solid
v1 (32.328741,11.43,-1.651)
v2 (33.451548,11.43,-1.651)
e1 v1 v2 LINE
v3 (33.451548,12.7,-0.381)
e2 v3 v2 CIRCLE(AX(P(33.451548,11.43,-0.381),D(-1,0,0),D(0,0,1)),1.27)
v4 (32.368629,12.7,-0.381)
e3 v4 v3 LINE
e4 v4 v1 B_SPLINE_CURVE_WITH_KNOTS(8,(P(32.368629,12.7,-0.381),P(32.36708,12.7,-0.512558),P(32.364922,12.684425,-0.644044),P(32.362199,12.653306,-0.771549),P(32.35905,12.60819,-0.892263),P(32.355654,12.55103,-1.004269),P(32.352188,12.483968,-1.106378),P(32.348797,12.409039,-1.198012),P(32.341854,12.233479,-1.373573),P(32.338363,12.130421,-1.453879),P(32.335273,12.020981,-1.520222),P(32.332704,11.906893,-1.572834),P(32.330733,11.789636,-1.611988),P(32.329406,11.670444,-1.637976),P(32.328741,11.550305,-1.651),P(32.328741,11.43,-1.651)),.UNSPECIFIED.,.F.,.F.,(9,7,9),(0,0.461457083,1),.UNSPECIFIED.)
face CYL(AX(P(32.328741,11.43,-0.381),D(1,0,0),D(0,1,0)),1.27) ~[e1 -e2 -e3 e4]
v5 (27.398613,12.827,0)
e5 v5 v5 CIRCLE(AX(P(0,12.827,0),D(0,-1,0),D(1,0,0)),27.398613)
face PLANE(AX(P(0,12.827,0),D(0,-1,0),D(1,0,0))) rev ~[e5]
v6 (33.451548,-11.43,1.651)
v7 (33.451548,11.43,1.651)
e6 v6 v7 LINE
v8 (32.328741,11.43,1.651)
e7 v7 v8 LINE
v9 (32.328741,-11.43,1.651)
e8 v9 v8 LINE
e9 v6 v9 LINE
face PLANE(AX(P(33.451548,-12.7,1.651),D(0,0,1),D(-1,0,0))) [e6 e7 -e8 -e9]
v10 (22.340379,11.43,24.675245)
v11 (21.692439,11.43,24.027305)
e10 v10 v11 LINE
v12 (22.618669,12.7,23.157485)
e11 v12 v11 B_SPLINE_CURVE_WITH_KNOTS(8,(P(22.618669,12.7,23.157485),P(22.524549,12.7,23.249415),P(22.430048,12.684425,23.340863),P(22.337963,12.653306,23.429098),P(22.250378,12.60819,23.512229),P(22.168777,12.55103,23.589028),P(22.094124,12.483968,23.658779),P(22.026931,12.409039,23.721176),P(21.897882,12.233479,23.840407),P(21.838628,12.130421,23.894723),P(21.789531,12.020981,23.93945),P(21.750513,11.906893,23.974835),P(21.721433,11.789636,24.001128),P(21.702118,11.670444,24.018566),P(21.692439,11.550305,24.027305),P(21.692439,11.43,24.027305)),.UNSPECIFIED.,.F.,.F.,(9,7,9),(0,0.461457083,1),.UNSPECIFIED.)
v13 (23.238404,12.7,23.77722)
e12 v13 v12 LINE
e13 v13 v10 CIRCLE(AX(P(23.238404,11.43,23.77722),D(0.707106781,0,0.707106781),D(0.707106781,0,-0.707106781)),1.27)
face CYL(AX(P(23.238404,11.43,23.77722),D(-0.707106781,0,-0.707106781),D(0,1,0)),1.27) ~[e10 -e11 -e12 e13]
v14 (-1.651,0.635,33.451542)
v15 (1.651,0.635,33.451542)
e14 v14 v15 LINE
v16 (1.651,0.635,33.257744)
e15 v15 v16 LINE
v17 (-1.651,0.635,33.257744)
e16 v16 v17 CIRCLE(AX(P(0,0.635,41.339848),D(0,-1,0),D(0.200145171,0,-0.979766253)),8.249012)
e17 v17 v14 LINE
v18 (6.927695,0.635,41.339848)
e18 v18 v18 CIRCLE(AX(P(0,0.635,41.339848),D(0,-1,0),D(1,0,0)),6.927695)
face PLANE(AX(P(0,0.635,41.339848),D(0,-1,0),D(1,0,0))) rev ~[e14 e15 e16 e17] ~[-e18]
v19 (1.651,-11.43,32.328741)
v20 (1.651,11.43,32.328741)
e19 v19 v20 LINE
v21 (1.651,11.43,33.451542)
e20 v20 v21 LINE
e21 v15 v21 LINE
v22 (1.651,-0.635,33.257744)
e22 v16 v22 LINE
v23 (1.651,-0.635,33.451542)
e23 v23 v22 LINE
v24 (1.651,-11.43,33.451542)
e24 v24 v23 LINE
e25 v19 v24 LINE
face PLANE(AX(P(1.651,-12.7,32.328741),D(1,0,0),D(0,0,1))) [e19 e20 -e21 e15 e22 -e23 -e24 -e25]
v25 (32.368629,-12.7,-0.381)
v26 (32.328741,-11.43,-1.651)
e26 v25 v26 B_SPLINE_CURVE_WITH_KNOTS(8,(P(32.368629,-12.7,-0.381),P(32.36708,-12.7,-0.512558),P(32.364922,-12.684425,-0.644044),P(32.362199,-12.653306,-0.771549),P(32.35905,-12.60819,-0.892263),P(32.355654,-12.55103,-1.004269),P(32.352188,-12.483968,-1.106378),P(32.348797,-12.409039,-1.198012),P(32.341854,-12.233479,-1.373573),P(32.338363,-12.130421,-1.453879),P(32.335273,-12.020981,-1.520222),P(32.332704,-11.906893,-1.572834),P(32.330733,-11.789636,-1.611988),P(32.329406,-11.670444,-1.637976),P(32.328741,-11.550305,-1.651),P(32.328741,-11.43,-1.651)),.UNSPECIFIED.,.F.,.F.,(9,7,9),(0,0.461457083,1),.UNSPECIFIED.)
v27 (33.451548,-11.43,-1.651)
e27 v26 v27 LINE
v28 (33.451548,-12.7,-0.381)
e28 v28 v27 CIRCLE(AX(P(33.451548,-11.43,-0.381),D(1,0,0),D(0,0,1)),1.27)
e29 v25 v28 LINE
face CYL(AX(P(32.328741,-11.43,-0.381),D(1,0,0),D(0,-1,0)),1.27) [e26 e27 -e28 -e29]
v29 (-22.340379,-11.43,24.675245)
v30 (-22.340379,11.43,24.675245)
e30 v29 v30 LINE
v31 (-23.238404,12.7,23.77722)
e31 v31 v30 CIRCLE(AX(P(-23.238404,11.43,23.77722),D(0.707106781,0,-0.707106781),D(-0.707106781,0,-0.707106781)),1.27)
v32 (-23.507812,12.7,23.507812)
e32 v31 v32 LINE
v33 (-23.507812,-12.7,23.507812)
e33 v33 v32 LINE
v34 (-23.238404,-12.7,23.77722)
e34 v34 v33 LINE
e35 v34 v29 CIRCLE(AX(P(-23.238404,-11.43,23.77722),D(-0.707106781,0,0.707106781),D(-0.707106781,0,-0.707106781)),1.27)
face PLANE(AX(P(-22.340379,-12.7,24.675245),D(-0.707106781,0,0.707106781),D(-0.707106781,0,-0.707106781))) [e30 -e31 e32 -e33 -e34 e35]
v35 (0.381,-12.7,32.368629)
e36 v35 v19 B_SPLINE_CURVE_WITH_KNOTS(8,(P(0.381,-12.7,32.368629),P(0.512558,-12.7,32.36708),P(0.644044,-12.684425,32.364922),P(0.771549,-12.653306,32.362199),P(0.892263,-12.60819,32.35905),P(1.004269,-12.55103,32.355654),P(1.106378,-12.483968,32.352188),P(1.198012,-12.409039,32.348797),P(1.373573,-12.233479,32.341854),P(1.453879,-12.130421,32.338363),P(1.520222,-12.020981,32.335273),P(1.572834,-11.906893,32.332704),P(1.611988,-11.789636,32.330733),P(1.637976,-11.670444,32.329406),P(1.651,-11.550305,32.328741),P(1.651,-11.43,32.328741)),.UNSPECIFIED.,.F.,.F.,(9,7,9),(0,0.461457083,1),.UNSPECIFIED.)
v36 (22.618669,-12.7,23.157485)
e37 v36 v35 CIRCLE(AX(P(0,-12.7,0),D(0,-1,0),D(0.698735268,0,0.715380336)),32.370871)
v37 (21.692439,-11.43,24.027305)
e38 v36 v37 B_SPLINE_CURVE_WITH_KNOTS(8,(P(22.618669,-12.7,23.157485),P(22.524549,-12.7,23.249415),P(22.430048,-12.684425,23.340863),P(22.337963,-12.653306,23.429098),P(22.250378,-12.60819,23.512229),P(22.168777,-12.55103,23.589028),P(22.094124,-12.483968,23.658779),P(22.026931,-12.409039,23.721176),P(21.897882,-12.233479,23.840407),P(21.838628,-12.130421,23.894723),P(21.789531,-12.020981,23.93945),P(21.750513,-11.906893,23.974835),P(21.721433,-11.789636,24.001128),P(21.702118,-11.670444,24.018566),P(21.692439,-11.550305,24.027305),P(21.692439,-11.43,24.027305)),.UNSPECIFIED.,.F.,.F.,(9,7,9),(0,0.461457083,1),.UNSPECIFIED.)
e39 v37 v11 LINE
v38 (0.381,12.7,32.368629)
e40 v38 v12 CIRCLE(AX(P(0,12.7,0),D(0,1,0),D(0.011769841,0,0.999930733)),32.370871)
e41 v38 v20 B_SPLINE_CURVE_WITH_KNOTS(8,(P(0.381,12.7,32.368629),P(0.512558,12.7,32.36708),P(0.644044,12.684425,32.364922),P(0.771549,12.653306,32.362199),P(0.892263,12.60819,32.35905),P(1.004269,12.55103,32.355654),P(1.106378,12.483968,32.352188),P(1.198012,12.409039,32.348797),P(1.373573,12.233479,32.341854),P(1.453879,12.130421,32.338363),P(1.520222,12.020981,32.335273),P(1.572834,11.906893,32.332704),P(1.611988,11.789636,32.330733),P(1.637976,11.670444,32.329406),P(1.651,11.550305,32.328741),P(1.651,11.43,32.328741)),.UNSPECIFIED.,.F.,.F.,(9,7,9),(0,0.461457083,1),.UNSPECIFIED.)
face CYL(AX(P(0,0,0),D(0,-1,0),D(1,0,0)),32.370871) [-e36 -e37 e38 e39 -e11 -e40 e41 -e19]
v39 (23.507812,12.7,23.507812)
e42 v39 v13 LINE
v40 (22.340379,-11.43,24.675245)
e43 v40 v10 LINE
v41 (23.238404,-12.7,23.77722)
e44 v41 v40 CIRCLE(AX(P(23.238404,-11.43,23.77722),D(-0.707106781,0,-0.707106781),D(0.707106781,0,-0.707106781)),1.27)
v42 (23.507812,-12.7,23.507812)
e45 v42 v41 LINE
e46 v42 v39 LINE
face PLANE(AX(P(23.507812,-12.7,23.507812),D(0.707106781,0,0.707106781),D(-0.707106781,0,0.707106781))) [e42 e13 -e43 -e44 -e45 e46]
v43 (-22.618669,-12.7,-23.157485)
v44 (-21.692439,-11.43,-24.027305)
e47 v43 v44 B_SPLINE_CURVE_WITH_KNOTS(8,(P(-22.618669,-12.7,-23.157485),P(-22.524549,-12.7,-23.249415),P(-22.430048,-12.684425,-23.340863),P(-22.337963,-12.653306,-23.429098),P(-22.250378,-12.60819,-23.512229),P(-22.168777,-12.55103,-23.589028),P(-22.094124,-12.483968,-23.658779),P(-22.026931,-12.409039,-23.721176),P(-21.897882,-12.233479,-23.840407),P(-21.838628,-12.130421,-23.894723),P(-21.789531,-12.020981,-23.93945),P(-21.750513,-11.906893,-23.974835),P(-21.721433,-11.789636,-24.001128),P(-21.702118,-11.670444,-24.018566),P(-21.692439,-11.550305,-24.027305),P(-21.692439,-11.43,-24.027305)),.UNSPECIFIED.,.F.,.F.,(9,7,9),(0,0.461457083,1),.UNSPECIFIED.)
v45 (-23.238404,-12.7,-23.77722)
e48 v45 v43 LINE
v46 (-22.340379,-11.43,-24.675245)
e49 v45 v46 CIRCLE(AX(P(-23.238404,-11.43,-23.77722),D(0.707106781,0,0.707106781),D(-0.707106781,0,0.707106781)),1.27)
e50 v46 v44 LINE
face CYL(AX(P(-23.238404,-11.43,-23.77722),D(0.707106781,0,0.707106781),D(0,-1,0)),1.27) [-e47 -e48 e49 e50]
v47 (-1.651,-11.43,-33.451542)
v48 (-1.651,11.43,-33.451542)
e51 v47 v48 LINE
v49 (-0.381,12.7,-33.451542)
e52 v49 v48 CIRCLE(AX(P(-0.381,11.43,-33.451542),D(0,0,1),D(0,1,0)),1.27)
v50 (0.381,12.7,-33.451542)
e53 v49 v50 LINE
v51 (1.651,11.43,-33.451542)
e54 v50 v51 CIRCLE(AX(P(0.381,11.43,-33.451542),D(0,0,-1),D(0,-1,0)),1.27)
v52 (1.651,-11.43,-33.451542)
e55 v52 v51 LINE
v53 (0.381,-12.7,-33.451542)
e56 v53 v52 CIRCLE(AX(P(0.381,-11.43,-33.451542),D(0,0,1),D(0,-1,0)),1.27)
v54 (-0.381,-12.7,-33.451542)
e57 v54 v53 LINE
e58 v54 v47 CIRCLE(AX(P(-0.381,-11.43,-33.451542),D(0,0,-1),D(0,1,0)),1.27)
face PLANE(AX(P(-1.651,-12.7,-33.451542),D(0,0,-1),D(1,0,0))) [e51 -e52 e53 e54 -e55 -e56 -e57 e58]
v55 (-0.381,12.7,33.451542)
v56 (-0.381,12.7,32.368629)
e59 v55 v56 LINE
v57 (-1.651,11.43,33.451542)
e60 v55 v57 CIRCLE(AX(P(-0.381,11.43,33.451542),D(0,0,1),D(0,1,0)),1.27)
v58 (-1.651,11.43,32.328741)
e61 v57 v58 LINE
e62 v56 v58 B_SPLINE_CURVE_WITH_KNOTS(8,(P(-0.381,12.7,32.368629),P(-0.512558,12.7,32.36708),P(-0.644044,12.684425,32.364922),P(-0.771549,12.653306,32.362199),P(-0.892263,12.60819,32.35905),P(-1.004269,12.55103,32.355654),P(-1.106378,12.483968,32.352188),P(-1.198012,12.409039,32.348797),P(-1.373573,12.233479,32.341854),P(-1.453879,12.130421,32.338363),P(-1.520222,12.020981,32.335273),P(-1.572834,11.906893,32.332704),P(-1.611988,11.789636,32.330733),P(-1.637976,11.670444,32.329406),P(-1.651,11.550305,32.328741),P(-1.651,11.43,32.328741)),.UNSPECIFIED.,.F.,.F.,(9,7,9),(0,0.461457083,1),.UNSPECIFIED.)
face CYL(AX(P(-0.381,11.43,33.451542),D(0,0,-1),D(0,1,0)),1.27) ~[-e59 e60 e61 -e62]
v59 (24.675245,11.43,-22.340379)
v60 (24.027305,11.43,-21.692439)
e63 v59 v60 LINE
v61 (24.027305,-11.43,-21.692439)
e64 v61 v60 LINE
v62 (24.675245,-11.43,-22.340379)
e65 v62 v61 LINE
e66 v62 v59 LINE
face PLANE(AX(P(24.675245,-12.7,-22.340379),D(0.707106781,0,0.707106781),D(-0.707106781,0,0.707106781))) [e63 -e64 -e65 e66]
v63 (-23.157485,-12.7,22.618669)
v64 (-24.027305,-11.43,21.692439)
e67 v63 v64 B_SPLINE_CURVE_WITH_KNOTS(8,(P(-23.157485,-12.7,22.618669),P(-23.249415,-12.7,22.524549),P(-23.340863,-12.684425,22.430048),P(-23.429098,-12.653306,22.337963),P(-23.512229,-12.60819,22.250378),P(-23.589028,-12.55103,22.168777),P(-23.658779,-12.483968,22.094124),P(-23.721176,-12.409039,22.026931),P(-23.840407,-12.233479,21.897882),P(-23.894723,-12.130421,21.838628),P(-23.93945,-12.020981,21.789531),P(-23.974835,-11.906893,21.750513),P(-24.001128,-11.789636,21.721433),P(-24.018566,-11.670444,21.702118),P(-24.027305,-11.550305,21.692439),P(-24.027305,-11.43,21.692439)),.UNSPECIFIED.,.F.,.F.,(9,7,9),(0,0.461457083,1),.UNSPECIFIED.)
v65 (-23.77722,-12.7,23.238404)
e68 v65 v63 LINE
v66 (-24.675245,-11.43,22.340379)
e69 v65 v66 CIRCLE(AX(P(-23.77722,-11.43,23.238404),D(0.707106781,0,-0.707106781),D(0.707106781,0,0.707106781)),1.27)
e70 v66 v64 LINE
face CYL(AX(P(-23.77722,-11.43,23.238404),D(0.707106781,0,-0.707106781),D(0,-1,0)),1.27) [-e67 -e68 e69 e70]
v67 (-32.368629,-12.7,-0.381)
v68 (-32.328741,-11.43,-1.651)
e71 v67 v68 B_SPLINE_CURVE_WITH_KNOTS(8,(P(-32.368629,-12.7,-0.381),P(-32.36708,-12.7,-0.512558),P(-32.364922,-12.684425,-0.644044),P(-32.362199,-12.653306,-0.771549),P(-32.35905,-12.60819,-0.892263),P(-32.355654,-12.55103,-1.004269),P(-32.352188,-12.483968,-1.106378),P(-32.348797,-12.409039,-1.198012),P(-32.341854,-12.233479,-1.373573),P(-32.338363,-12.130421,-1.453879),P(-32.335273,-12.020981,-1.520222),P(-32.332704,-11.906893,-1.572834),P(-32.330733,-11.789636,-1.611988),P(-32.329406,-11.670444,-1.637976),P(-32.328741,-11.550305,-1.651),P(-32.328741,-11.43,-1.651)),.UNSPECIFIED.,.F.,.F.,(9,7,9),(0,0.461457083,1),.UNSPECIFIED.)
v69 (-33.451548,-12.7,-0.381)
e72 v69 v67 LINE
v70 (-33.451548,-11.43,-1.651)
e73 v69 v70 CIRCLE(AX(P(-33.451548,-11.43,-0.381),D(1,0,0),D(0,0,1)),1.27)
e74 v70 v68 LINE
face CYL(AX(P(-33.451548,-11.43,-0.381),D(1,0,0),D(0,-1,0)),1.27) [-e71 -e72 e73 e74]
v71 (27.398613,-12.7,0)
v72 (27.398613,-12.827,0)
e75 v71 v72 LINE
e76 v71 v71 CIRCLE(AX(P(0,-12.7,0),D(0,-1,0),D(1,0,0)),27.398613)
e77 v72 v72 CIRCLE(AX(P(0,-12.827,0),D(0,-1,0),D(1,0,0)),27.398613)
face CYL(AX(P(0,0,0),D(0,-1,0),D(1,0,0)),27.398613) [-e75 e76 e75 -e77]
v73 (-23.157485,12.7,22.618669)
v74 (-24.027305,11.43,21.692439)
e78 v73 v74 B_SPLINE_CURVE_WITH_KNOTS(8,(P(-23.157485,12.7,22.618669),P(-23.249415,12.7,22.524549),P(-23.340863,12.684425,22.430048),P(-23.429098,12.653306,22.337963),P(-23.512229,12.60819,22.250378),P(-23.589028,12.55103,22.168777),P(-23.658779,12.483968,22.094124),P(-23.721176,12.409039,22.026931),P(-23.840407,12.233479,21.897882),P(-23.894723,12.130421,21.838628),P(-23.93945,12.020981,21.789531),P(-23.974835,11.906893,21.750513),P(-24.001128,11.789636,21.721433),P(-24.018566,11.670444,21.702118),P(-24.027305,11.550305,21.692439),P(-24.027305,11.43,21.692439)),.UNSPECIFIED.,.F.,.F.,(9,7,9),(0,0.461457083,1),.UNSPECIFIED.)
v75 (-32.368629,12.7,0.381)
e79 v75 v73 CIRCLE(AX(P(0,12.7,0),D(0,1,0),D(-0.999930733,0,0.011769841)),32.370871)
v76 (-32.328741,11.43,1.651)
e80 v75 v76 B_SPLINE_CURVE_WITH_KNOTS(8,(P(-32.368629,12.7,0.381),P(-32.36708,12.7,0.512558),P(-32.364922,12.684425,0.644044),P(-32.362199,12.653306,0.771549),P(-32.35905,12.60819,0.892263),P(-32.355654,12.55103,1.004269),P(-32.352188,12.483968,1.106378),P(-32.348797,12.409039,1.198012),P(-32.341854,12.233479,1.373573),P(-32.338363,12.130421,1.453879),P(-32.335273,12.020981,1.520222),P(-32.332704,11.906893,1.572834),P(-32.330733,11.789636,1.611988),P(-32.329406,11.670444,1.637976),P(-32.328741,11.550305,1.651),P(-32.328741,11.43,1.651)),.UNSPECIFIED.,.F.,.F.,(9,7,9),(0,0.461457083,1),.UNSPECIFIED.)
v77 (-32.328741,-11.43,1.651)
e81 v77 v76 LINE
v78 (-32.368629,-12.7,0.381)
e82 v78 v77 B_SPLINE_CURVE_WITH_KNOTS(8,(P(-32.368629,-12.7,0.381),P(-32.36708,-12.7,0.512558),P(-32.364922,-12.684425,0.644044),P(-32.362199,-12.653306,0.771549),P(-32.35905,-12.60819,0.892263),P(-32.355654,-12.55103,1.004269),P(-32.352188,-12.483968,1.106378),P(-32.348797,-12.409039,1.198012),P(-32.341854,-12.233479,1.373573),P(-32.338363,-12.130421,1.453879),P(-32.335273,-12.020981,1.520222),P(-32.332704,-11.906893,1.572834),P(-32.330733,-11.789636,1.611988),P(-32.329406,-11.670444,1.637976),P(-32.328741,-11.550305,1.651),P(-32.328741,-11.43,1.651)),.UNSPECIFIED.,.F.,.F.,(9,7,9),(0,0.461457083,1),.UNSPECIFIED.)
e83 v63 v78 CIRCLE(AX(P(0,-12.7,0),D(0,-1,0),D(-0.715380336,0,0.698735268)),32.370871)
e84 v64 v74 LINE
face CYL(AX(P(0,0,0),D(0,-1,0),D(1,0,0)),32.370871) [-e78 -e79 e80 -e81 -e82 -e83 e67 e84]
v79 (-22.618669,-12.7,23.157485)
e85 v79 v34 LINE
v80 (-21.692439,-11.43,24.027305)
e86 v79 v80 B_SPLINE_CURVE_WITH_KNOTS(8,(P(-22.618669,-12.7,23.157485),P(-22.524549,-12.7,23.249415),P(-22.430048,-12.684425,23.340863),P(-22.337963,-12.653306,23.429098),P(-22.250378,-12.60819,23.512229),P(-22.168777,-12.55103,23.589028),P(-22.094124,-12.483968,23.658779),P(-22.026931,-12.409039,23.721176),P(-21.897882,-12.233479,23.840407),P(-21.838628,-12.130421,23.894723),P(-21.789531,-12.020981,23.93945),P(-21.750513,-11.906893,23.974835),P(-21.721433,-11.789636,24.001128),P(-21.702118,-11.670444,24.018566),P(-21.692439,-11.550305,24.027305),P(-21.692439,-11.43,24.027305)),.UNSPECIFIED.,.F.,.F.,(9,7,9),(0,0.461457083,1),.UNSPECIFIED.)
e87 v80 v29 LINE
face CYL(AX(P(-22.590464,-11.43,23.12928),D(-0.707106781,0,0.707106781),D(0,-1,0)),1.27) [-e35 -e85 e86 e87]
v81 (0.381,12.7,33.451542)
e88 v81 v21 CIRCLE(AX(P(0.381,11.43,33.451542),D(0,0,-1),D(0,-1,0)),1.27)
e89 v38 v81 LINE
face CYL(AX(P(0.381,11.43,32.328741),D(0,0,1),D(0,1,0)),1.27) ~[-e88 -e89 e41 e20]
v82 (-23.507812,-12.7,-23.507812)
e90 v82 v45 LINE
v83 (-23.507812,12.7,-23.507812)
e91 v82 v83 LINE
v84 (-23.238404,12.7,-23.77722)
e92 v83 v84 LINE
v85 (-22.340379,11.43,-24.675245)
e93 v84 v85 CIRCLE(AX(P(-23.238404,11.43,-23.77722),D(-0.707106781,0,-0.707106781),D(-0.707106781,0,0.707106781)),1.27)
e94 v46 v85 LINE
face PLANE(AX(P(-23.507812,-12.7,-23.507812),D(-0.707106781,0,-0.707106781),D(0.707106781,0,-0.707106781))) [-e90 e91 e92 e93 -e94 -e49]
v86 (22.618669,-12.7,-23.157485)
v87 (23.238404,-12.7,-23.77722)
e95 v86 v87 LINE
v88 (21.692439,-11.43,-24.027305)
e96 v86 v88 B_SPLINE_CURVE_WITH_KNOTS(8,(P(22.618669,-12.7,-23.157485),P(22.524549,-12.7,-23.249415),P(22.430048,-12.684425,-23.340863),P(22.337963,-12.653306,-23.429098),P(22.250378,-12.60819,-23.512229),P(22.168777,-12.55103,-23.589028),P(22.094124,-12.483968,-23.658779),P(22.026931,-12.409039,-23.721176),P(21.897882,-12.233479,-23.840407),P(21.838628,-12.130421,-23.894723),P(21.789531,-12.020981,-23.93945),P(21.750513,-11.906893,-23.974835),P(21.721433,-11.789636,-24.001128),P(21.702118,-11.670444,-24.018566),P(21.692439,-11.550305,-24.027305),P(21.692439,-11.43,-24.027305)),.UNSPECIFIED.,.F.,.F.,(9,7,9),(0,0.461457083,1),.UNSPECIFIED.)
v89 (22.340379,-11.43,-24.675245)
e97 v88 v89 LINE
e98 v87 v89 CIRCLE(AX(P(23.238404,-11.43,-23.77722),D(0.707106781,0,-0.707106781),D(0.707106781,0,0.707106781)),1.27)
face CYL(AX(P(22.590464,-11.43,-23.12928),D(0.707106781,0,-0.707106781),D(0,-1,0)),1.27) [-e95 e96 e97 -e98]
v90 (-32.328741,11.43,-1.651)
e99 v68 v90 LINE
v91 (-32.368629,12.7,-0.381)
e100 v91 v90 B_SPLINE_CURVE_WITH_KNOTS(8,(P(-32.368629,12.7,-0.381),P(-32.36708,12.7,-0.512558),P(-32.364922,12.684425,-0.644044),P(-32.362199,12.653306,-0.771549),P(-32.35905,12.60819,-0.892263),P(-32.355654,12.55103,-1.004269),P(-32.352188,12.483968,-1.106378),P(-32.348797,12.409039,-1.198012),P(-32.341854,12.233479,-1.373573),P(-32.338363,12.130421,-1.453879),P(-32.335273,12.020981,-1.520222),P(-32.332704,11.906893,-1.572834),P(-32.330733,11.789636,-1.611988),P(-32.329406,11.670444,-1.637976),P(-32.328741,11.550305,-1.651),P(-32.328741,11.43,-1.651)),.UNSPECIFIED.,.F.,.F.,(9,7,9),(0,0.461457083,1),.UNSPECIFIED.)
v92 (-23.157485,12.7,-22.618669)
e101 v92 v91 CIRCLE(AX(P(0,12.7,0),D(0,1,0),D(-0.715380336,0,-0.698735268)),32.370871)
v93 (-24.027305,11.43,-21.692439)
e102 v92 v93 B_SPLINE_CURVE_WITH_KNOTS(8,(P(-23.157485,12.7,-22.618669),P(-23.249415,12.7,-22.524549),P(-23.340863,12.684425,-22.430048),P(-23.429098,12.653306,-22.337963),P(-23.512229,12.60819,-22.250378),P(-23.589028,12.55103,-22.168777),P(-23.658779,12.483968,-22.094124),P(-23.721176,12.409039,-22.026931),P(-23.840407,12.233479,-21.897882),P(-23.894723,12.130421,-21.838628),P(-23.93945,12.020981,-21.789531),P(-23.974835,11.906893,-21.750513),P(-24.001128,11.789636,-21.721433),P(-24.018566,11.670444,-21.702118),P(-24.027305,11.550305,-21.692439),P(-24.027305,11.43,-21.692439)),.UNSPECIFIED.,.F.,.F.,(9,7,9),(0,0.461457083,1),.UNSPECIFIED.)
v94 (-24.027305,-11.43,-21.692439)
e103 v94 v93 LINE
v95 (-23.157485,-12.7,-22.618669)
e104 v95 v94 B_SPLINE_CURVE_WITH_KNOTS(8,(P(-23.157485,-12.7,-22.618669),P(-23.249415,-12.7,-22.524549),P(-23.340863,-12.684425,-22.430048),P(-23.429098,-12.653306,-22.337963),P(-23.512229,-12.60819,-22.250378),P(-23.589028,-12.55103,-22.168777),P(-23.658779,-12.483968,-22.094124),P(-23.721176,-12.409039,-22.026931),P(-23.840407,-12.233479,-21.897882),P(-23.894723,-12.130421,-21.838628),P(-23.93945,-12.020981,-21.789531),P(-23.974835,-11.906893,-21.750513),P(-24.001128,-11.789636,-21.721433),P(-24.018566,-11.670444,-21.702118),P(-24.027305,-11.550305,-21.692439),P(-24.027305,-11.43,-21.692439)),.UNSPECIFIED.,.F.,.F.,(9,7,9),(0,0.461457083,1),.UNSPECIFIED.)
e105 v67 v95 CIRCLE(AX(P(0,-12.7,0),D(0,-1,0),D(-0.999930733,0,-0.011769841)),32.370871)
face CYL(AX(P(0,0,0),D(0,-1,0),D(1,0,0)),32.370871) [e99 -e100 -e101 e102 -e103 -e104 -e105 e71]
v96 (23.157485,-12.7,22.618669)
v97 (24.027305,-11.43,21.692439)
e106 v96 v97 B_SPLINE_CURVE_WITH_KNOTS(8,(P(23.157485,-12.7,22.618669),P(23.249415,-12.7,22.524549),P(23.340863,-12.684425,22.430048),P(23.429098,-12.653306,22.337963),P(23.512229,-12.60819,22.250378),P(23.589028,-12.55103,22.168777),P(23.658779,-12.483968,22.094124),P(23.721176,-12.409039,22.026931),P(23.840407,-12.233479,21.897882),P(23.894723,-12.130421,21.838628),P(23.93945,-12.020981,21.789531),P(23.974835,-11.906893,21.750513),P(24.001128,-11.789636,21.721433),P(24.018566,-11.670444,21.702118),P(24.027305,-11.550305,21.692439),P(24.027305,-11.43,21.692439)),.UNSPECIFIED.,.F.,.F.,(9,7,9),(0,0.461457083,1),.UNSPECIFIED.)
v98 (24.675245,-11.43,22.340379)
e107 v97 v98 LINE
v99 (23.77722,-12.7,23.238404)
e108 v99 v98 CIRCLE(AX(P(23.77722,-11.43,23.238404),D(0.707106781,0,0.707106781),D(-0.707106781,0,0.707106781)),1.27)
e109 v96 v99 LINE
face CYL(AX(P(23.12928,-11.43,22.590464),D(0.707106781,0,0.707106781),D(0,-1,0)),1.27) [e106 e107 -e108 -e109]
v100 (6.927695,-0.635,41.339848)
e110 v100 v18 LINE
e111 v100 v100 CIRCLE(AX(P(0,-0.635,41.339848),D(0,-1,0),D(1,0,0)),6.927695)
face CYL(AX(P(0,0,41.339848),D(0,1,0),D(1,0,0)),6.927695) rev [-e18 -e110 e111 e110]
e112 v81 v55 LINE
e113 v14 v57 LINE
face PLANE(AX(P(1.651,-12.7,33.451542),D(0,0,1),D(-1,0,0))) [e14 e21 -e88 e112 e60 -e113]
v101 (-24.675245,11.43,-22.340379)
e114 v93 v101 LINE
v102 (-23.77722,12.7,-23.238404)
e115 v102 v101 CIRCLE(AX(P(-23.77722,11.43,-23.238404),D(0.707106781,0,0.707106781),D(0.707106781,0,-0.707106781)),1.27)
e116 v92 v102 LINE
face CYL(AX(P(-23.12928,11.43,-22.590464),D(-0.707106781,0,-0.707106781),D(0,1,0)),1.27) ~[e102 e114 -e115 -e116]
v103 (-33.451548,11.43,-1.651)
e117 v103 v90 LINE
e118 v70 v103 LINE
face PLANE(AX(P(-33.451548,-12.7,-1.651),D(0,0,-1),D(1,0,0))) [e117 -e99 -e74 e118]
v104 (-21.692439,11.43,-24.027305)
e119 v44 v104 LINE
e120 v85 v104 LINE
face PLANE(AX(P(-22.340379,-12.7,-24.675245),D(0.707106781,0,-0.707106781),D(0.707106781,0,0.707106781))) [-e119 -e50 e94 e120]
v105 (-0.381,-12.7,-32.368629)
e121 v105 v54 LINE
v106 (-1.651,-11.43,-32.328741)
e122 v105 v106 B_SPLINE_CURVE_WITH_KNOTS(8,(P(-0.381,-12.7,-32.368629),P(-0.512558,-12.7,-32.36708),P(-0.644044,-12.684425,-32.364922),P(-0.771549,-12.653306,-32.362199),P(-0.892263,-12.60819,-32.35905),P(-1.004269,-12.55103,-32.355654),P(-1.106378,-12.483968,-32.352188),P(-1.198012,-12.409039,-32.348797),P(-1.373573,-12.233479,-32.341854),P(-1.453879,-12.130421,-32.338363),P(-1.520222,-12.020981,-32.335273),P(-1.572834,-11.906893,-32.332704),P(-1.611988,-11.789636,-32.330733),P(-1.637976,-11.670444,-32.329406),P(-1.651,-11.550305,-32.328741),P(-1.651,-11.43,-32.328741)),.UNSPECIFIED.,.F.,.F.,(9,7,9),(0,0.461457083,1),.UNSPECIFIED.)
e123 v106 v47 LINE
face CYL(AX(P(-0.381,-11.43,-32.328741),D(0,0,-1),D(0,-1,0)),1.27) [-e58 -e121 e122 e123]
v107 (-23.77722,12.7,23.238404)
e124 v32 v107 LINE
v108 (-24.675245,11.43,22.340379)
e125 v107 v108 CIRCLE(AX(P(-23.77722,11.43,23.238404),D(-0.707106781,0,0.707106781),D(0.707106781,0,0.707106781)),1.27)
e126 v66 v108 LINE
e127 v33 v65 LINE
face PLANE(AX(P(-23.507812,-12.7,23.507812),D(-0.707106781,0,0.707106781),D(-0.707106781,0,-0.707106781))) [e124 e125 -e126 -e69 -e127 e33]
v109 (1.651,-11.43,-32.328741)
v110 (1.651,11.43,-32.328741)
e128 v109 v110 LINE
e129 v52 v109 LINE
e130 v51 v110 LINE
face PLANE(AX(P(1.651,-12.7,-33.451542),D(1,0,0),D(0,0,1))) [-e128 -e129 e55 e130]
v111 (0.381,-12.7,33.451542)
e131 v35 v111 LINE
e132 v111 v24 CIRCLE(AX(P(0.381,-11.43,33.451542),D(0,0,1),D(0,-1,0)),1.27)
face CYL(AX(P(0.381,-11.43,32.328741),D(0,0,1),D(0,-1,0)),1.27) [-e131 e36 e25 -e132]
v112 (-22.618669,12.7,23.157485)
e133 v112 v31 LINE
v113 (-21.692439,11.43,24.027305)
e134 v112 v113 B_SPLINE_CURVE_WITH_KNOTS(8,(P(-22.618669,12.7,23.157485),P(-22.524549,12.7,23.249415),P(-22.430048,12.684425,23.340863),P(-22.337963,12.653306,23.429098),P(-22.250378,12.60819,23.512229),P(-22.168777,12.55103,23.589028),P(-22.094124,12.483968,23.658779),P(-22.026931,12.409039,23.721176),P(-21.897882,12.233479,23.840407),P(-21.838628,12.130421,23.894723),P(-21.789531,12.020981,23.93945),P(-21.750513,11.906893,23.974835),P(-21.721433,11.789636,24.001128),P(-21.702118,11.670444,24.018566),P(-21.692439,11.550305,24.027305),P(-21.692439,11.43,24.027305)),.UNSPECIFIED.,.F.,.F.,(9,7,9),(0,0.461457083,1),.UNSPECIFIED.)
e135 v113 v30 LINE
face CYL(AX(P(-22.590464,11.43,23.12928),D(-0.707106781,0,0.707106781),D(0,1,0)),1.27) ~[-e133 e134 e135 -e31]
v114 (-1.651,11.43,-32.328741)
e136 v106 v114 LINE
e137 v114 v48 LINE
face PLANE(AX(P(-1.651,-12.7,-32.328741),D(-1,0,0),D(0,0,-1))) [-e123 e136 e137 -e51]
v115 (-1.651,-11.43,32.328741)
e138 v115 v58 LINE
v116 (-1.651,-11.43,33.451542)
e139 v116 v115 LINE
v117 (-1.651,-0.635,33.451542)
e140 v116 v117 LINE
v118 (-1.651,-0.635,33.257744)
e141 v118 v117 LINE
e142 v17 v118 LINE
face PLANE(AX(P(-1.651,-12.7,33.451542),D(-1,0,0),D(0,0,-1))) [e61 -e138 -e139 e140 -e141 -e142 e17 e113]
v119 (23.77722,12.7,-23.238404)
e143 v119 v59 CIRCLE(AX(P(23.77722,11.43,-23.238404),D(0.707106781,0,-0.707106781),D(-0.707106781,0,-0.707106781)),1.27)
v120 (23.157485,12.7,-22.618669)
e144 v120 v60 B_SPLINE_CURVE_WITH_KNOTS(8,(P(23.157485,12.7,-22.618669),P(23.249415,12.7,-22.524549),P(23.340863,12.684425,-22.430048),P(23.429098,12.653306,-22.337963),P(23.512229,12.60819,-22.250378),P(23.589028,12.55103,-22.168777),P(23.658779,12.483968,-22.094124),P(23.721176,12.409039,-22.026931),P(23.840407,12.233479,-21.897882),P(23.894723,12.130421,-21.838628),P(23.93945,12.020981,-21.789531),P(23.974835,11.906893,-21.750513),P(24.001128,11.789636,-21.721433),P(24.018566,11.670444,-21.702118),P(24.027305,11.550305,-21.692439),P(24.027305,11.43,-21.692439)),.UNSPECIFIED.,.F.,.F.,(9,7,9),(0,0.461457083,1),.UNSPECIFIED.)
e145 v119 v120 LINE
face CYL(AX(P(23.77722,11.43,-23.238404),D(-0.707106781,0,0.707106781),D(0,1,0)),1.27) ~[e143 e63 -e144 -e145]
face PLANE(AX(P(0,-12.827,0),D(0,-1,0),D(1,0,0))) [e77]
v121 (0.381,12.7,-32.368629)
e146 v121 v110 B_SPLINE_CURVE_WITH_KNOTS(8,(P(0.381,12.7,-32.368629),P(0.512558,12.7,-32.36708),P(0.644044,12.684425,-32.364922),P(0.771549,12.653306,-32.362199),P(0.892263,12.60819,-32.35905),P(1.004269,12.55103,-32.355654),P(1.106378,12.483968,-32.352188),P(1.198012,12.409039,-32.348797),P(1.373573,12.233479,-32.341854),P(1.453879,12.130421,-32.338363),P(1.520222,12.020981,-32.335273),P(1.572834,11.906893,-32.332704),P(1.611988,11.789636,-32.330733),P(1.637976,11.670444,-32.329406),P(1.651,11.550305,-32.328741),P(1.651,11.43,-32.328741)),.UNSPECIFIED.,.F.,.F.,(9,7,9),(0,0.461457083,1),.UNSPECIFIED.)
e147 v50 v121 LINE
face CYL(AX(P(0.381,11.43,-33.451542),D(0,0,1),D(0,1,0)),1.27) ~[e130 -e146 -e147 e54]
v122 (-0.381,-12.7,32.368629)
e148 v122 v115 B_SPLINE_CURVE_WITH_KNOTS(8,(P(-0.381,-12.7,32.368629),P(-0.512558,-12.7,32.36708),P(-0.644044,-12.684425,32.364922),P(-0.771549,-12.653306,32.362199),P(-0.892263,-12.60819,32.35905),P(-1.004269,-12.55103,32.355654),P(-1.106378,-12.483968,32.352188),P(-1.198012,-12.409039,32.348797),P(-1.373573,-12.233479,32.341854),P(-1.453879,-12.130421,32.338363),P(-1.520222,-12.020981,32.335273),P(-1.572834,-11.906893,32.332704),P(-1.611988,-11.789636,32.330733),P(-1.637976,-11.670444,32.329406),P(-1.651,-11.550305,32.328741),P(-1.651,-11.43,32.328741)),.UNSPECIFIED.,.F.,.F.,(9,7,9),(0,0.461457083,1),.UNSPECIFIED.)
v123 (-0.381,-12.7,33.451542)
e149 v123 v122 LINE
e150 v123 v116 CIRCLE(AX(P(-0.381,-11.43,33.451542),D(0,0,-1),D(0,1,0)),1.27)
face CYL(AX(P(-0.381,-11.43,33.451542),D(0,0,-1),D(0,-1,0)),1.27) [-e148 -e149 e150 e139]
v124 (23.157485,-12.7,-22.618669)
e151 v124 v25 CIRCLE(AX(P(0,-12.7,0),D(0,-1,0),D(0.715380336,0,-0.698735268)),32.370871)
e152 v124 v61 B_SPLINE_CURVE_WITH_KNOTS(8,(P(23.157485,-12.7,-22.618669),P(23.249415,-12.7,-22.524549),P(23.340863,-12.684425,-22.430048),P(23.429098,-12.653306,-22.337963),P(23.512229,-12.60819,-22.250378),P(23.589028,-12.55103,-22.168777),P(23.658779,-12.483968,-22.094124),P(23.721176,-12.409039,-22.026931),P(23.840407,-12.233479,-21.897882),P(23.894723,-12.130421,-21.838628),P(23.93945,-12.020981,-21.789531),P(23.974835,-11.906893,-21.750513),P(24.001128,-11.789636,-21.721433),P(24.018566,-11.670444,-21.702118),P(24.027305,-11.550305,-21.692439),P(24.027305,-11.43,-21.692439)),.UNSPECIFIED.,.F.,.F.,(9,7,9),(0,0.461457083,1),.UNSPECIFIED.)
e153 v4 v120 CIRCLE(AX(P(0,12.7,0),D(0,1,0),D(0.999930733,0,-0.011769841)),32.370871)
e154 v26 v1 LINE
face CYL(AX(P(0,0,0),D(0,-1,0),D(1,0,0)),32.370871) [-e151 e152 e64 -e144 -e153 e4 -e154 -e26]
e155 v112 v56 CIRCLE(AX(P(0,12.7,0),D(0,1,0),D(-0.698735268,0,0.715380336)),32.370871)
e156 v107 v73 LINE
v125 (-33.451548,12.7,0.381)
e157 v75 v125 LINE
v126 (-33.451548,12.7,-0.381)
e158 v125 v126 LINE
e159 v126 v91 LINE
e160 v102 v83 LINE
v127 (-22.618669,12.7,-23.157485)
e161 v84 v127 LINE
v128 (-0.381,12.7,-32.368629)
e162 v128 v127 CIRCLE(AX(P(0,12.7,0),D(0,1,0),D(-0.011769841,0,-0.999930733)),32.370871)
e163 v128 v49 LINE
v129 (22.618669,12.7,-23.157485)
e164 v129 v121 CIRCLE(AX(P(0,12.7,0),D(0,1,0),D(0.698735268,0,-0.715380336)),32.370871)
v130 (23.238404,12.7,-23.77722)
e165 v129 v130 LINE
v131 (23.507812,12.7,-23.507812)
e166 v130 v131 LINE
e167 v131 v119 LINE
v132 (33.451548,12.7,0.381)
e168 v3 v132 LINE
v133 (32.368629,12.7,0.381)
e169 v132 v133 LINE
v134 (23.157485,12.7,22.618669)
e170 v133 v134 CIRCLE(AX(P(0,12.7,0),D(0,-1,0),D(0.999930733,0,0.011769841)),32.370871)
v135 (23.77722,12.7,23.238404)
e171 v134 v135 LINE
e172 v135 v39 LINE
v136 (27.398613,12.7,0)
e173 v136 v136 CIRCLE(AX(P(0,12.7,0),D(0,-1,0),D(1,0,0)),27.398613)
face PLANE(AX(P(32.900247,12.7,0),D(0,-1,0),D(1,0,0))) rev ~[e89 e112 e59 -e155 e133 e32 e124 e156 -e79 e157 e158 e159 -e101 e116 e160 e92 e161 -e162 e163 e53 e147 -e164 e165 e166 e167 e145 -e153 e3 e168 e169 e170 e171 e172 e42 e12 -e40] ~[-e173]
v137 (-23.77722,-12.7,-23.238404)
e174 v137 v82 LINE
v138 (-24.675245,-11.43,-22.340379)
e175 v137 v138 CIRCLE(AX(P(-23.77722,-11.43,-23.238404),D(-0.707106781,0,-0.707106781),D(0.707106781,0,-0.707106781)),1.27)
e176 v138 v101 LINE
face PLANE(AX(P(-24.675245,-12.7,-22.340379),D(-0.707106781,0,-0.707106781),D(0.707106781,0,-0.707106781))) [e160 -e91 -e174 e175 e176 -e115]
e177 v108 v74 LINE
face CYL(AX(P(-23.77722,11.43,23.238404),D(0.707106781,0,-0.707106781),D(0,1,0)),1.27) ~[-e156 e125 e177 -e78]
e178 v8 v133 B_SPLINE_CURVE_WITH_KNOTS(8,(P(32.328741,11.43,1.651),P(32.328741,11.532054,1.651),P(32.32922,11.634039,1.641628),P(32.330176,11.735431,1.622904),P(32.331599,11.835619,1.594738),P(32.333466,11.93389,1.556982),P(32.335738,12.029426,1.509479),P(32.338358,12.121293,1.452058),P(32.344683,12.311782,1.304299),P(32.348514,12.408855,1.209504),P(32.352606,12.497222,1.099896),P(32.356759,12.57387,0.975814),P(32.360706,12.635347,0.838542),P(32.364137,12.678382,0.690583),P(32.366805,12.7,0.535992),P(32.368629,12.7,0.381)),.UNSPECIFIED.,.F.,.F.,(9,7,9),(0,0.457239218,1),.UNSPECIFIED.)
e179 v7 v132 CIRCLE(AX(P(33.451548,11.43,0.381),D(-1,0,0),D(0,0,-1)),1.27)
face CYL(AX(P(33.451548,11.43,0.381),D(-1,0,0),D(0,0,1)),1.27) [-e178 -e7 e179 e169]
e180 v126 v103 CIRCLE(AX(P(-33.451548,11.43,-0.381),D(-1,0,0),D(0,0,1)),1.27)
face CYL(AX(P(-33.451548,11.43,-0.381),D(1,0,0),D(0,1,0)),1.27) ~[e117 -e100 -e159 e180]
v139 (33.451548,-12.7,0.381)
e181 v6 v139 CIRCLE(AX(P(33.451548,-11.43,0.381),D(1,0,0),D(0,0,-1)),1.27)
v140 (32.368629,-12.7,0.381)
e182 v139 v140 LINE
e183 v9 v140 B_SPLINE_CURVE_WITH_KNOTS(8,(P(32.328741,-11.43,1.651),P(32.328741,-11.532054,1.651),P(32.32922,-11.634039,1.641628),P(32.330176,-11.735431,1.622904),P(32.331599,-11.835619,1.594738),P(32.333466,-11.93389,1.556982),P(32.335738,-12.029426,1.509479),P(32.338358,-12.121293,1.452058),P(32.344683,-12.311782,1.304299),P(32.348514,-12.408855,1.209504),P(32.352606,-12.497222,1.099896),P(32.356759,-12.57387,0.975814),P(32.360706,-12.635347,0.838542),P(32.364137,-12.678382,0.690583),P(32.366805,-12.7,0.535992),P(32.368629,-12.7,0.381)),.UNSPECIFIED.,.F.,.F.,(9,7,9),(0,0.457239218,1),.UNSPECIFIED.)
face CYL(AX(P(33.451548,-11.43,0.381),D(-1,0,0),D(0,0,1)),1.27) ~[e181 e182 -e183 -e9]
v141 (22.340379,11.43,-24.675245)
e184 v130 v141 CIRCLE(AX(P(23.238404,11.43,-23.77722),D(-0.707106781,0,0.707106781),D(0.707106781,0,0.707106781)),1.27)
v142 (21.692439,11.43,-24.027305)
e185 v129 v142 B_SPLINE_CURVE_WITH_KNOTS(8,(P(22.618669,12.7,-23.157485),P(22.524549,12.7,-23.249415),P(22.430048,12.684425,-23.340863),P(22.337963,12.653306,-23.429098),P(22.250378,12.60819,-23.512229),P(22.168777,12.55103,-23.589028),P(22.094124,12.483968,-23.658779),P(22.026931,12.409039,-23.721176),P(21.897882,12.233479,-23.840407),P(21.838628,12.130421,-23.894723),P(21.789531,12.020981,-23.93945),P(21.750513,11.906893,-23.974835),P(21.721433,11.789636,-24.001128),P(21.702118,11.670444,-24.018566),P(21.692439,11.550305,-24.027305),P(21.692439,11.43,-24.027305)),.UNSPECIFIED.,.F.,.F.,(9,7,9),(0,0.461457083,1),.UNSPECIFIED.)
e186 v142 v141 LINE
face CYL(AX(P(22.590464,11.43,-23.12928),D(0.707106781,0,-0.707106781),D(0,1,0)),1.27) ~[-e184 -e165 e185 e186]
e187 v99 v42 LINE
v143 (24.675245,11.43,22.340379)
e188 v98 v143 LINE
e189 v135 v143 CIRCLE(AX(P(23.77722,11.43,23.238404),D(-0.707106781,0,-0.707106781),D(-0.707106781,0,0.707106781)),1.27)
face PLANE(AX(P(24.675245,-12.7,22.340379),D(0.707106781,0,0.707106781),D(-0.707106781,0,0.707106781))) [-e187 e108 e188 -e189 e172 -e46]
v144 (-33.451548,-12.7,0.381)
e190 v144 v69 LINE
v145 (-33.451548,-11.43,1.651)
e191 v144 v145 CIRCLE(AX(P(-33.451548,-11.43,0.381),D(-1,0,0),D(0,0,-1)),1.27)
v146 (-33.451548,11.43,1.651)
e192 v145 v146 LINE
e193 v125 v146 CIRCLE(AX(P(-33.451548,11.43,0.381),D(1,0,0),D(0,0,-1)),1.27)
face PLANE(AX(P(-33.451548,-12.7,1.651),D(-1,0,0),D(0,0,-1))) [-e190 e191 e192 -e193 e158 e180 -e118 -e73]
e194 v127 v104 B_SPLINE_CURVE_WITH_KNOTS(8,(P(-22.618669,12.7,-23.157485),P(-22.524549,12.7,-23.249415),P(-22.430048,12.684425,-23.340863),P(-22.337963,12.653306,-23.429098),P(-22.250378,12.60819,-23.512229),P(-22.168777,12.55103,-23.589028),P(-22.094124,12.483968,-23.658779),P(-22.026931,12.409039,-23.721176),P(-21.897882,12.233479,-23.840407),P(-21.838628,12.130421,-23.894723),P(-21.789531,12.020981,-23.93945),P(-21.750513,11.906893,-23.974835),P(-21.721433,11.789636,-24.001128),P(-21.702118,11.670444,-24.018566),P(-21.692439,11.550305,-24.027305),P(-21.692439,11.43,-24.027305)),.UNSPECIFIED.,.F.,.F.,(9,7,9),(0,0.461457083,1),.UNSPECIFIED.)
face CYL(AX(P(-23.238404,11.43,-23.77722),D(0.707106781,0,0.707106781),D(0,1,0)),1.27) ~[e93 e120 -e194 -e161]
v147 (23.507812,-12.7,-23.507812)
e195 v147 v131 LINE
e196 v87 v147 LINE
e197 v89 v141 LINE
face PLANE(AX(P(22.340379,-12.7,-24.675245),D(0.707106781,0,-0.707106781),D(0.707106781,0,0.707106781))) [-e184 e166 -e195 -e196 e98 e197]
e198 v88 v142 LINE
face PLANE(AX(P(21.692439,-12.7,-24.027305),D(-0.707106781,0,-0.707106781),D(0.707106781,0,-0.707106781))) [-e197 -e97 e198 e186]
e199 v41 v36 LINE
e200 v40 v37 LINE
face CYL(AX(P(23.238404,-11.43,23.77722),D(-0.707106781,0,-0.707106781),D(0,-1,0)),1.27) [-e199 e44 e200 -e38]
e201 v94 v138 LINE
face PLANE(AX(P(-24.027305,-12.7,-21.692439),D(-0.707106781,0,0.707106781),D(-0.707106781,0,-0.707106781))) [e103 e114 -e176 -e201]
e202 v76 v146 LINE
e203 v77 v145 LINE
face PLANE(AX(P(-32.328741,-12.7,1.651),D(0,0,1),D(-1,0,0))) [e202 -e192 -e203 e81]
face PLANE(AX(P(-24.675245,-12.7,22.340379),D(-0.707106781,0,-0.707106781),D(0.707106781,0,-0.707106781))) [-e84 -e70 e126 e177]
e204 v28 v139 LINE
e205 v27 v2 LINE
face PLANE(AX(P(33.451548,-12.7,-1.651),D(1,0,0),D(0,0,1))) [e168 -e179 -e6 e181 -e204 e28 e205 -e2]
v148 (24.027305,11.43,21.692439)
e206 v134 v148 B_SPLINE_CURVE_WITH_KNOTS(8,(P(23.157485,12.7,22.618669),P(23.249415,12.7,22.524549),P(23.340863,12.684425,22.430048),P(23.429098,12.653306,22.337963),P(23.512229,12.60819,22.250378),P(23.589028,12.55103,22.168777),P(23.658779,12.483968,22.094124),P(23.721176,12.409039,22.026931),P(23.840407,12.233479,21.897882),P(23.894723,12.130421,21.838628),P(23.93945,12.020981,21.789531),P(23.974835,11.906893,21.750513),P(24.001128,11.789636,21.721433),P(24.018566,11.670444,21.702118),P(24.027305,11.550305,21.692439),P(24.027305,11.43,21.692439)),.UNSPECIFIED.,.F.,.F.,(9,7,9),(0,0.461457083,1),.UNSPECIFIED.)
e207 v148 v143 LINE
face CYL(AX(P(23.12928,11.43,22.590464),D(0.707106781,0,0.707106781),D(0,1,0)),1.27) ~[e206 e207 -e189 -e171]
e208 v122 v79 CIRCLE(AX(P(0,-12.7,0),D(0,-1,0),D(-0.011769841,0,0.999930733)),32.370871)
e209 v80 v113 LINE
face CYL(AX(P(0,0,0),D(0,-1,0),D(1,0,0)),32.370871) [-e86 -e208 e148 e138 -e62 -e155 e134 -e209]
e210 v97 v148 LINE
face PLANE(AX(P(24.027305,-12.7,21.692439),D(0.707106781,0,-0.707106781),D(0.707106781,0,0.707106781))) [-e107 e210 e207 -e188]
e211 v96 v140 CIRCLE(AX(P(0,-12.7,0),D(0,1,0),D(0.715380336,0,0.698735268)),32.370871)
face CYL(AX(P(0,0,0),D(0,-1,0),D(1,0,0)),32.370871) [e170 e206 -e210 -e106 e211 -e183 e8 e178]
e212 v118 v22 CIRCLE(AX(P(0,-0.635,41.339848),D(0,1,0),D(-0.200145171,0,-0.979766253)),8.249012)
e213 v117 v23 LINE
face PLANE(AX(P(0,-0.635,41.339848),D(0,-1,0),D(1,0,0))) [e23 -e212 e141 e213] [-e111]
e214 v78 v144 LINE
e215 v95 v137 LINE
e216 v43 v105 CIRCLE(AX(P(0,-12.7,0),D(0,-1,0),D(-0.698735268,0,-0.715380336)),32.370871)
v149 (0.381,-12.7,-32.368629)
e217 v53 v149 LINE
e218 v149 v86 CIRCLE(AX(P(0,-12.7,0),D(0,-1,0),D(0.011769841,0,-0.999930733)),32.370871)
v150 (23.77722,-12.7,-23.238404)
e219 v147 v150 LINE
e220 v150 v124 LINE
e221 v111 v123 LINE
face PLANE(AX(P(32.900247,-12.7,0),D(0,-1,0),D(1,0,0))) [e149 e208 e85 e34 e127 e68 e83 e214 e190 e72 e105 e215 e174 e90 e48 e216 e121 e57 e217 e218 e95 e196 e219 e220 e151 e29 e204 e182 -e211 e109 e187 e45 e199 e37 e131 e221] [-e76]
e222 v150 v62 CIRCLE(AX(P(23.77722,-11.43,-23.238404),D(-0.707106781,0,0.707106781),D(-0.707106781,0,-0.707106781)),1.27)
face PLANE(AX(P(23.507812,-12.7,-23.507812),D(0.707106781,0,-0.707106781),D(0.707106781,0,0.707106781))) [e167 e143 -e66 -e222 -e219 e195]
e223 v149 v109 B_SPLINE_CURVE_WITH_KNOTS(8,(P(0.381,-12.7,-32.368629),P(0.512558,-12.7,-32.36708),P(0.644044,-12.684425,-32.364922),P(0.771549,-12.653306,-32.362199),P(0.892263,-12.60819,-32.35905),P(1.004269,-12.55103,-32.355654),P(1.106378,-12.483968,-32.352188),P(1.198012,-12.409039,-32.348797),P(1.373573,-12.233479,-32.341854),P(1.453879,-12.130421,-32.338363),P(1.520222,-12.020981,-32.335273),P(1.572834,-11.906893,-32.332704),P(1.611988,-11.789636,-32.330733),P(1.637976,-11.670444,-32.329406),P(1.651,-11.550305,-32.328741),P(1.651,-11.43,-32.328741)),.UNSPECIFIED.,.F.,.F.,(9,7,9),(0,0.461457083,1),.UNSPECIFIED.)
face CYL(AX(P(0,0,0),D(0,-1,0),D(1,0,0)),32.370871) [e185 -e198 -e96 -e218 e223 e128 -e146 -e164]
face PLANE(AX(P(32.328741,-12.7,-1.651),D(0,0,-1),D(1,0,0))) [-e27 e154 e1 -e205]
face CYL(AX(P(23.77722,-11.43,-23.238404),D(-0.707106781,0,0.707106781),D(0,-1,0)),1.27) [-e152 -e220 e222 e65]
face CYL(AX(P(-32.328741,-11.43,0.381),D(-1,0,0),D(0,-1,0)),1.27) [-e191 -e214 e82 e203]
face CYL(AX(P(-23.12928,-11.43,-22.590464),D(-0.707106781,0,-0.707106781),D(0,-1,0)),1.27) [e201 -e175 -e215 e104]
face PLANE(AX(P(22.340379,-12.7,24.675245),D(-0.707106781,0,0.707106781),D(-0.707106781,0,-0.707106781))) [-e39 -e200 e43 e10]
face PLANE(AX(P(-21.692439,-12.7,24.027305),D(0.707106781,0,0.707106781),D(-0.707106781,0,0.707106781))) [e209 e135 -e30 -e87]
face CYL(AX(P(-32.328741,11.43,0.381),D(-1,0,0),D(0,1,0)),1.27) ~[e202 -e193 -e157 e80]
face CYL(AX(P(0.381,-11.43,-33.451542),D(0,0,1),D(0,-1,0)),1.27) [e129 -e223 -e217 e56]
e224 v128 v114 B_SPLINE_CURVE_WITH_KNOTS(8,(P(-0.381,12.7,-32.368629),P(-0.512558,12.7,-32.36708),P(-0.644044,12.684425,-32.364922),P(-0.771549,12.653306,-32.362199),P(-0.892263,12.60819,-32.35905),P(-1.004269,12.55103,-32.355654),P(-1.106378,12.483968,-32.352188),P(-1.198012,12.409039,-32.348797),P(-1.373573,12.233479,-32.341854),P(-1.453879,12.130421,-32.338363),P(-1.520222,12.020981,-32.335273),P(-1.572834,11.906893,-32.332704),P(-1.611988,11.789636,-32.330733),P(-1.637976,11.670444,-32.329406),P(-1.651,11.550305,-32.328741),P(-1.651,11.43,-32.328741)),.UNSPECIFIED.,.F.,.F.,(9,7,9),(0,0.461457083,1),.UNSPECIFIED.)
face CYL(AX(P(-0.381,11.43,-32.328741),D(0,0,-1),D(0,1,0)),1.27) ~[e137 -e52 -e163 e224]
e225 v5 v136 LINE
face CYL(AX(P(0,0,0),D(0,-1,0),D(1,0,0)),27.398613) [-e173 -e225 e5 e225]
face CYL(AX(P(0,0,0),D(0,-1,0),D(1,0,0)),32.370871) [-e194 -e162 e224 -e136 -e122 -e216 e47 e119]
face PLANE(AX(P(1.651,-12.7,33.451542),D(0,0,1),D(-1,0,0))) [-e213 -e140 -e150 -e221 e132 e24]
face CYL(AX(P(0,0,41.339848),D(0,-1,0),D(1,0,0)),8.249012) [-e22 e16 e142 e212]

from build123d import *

# Parameters (mm, degrees)
F0_R     = 32.3708711279
F1_DEPTH = 12.7
F2_R     = 27.3986132433
F3_DEPTH = 12.827
F5_DEPTH = 25.4
F6_R     = 1.27
F8_R     = 8.2490124286
F8_R_2   = 6.9276952265
F9_DEPTH = 0.635


# Not quite as in the source:
# - two fillets or chamfers of one size are made in one step


with BuildPart() as f1:
    # F0 (on Front) → F1 (new body, symmetric)
    with BuildSketch(Plane.XZ):
        Circle(F0_R)
    extrude(amount=F1_DEPTH, both=True)

    # F2 (on Front) → F3 (join, symmetric)
    with BuildSketch(Plane.XZ):
        Circle(F2_R)
    extrude(amount=F3_DEPTH, both=True)

    # F4 (on face) → F5 (join)
    with BuildSketch(Plane.XZ.offset(12.7)):
        with BuildLine():
            ThreePointArc((-24.0273053052, 21.6924387138), (-22.8896624875, 22.8896624875), (-21.6924387138, 24.0273053052))
            Line((-21.6924387138, 24.0273053052), (-22.3403787647, 24.6752453562))
            Line((-22.3403787647, 24.6752453562), (-23.5078120604, 23.5078120604))
            Line((-23.5078120604, 23.5078120604), (-24.6752453562, 22.3403787647))
            Line((-24.6752453562, 22.3403787647), (-24.0273053052, 21.6924387138))
        make_face()
        with BuildLine():
            Line((24.6752453562, 22.3403787647), (23.5078120604, 23.5078120604))
            Line((23.5078120604, 23.5078120604), (22.3403787647, 24.6752453562))
            Line((22.3403787647, 24.6752453562), (21.6924387138, 24.0273053052))
            ThreePointArc((21.6924387138, 24.0273053052), (22.8896624875, 22.8896624875), (24.0273053052, 21.6924387138))
            Line((24.0273053052, 21.6924387138), (24.6752453562, 22.3403787647))
        make_face()
        with BuildLine():
            Line((24.6752453562, -22.3403787647), (24.0273053052, -21.6924387138))
            ThreePointArc((24.0273053052, -21.6924387138), (22.8896624875, -22.8896624875), (21.6924387138, -24.0273053052))
            Line((21.6924387138, -24.0273053052), (22.3403787647, -24.6752453562))
            Line((22.3403787647, -24.6752453562), (23.5078120604, -23.5078120604))
            Line((23.5078120604, -23.5078120604), (24.6752453562, -22.3403787647))
        make_face()
        with BuildLine():
            ThreePointArc((-21.6924387138, -24.0273053052), (-22.8896624875, -22.8896624875), (-24.0273053052, -21.6924387138))
            Line((-24.0273053052, -21.6924387138), (-24.6752453562, -22.3403787647))
            Line((-24.6752453562, -22.3403787647), (-23.5078120604, -23.5078120604))
            Line((-23.5078120604, -23.5078120604), (-22.3403787647, -24.6752453562))
            Line((-22.3403787647, -24.6752453562), (-21.6924387138, -24.0273053052))
        make_face()
        with BuildLine():
            Line((1.651, -33.4515422583), (1.651, -32.3287410299))
            ThreePointArc((1.651, -32.3287410299), (0, -32.3708711279), (-1.651, -32.3287410299))
            Line((-1.651, -32.3287410299), (-1.651, -33.4515422583))
            Line((-1.651, -33.4515422583), (0, -33.4515422583))
            Line((0, -33.4515422583), (1.651, -33.4515422583))
        make_face()
        with BuildLine():
            ThreePointArc((-32.3287410299, -1.651), (-32.3708711279, 0), (-32.3287410299, 1.651))
            Line((-32.3287410299, 1.651), (-33.4515480299, 1.651))
            Line((-33.4515480299, 1.651), (-33.4515480299, 0))
            Line((-33.4515480299, 0), (-33.4515480299, -1.651))
            Line((-33.4515480299, -1.651), (-32.3287410299, -1.651))
        make_face()
        with BuildLine():
            Line((33.4515480299, 1.651), (32.3287410299, 1.651))
            ThreePointArc((32.3287410299, 1.651), (32.3603368894, 0.8257687245), (32.3708711279, 0))
            ThreePointArc((32.3708711279, 0), (32.3603368894, -0.8257687245), (32.3287410299, -1.651))
            Line((32.3287410299, -1.651), (33.4515480299, -1.651))
            Line((33.4515480299, -1.651), (33.4515480299, 0))
            Line((33.4515480299, 0), (33.4515480299, 1.651))
        make_face()
        with BuildLine():
            ThreePointArc((-1.651, 32.3287410299), (0, 32.3708711279), (1.651, 32.3287410299))
            Line((1.651, 32.3287410299), (1.651, 33.4515422583))
            Line((1.651, 33.4515422583), (0, 33.4515422583))
            Line((0, 33.4515422583), (-1.651, 33.4515422583))
            Line((-1.651, 33.4515422583), (-1.651, 32.3287410299))
        make_face()
    extrude(amount=-F5_DEPTH)

    # F6
    f6_edges = [f1.edges().sort_by_distance(p)[0] for p in [
        (24.351275, 12.7, -22.016409),
        (22.016409, 12.7, -24.351275),
        (24.351275, -12.7, -22.016409),
        (22.016409, -12.7, -24.351275),
        (24.351275, -12.7, 22.016409),
        (22.016409, -12.7, 24.351275),
        (22.016409, 12.7, 24.351275),
        (24.351275, 12.7, 22.016409),
        (-22.016409, 12.7, 24.351275),
        (-24.351275, 12.7, 22.016409),
        (-24.351275, 12.7, -22.016409),
        (-22.016409, 12.7, -24.351275),
        (-22.016409, -12.7, -24.351275),
        (-24.351275, -12.7, -22.016409),
        (-24.351275, -12.7, 22.016409),
        (-22.016409, -12.7, 24.351275),
        (32.890145, -12.7, 1.651),
        (32.890145, 12.7, 1.651),
        (1.651, -12.7, 32.890142),
        (-1.651, -12.7, 32.890142),
        (-32.890145, -12.7, 1.651),
        (-32.890145, -12.7, -1.651),
        (-1.651, -12.7, -32.890142),
        (1.651, -12.7, -32.890142),
        (32.890145, -12.7, -1.651),
        (1.651, 12.7, 32.890142),
        (-1.651, 12.7, 32.890142),
        (-32.890145, 12.7, 1.651),
        (-32.890145, 12.7, -1.651),
        (-1.651, 12.7, -32.890142),
        (1.651, 12.7, -32.890142),
        (32.890145, 12.7, -1.651),
    ]]
    fillet(f6_edges, radius=F6_R)

    # F8 (on Front) → F9 (join, symmetric)
    with BuildSketch(Plane.XZ):
        with Locations((0, 41.3398481905)):
            Circle(F8_R)
        with Locations((0, 41.3398481905)):
            Circle(F8_R_2, mode=Mode.SUBTRACT)
    extrude(amount=F9_DEPTH, both=True)


solid = f1.part
